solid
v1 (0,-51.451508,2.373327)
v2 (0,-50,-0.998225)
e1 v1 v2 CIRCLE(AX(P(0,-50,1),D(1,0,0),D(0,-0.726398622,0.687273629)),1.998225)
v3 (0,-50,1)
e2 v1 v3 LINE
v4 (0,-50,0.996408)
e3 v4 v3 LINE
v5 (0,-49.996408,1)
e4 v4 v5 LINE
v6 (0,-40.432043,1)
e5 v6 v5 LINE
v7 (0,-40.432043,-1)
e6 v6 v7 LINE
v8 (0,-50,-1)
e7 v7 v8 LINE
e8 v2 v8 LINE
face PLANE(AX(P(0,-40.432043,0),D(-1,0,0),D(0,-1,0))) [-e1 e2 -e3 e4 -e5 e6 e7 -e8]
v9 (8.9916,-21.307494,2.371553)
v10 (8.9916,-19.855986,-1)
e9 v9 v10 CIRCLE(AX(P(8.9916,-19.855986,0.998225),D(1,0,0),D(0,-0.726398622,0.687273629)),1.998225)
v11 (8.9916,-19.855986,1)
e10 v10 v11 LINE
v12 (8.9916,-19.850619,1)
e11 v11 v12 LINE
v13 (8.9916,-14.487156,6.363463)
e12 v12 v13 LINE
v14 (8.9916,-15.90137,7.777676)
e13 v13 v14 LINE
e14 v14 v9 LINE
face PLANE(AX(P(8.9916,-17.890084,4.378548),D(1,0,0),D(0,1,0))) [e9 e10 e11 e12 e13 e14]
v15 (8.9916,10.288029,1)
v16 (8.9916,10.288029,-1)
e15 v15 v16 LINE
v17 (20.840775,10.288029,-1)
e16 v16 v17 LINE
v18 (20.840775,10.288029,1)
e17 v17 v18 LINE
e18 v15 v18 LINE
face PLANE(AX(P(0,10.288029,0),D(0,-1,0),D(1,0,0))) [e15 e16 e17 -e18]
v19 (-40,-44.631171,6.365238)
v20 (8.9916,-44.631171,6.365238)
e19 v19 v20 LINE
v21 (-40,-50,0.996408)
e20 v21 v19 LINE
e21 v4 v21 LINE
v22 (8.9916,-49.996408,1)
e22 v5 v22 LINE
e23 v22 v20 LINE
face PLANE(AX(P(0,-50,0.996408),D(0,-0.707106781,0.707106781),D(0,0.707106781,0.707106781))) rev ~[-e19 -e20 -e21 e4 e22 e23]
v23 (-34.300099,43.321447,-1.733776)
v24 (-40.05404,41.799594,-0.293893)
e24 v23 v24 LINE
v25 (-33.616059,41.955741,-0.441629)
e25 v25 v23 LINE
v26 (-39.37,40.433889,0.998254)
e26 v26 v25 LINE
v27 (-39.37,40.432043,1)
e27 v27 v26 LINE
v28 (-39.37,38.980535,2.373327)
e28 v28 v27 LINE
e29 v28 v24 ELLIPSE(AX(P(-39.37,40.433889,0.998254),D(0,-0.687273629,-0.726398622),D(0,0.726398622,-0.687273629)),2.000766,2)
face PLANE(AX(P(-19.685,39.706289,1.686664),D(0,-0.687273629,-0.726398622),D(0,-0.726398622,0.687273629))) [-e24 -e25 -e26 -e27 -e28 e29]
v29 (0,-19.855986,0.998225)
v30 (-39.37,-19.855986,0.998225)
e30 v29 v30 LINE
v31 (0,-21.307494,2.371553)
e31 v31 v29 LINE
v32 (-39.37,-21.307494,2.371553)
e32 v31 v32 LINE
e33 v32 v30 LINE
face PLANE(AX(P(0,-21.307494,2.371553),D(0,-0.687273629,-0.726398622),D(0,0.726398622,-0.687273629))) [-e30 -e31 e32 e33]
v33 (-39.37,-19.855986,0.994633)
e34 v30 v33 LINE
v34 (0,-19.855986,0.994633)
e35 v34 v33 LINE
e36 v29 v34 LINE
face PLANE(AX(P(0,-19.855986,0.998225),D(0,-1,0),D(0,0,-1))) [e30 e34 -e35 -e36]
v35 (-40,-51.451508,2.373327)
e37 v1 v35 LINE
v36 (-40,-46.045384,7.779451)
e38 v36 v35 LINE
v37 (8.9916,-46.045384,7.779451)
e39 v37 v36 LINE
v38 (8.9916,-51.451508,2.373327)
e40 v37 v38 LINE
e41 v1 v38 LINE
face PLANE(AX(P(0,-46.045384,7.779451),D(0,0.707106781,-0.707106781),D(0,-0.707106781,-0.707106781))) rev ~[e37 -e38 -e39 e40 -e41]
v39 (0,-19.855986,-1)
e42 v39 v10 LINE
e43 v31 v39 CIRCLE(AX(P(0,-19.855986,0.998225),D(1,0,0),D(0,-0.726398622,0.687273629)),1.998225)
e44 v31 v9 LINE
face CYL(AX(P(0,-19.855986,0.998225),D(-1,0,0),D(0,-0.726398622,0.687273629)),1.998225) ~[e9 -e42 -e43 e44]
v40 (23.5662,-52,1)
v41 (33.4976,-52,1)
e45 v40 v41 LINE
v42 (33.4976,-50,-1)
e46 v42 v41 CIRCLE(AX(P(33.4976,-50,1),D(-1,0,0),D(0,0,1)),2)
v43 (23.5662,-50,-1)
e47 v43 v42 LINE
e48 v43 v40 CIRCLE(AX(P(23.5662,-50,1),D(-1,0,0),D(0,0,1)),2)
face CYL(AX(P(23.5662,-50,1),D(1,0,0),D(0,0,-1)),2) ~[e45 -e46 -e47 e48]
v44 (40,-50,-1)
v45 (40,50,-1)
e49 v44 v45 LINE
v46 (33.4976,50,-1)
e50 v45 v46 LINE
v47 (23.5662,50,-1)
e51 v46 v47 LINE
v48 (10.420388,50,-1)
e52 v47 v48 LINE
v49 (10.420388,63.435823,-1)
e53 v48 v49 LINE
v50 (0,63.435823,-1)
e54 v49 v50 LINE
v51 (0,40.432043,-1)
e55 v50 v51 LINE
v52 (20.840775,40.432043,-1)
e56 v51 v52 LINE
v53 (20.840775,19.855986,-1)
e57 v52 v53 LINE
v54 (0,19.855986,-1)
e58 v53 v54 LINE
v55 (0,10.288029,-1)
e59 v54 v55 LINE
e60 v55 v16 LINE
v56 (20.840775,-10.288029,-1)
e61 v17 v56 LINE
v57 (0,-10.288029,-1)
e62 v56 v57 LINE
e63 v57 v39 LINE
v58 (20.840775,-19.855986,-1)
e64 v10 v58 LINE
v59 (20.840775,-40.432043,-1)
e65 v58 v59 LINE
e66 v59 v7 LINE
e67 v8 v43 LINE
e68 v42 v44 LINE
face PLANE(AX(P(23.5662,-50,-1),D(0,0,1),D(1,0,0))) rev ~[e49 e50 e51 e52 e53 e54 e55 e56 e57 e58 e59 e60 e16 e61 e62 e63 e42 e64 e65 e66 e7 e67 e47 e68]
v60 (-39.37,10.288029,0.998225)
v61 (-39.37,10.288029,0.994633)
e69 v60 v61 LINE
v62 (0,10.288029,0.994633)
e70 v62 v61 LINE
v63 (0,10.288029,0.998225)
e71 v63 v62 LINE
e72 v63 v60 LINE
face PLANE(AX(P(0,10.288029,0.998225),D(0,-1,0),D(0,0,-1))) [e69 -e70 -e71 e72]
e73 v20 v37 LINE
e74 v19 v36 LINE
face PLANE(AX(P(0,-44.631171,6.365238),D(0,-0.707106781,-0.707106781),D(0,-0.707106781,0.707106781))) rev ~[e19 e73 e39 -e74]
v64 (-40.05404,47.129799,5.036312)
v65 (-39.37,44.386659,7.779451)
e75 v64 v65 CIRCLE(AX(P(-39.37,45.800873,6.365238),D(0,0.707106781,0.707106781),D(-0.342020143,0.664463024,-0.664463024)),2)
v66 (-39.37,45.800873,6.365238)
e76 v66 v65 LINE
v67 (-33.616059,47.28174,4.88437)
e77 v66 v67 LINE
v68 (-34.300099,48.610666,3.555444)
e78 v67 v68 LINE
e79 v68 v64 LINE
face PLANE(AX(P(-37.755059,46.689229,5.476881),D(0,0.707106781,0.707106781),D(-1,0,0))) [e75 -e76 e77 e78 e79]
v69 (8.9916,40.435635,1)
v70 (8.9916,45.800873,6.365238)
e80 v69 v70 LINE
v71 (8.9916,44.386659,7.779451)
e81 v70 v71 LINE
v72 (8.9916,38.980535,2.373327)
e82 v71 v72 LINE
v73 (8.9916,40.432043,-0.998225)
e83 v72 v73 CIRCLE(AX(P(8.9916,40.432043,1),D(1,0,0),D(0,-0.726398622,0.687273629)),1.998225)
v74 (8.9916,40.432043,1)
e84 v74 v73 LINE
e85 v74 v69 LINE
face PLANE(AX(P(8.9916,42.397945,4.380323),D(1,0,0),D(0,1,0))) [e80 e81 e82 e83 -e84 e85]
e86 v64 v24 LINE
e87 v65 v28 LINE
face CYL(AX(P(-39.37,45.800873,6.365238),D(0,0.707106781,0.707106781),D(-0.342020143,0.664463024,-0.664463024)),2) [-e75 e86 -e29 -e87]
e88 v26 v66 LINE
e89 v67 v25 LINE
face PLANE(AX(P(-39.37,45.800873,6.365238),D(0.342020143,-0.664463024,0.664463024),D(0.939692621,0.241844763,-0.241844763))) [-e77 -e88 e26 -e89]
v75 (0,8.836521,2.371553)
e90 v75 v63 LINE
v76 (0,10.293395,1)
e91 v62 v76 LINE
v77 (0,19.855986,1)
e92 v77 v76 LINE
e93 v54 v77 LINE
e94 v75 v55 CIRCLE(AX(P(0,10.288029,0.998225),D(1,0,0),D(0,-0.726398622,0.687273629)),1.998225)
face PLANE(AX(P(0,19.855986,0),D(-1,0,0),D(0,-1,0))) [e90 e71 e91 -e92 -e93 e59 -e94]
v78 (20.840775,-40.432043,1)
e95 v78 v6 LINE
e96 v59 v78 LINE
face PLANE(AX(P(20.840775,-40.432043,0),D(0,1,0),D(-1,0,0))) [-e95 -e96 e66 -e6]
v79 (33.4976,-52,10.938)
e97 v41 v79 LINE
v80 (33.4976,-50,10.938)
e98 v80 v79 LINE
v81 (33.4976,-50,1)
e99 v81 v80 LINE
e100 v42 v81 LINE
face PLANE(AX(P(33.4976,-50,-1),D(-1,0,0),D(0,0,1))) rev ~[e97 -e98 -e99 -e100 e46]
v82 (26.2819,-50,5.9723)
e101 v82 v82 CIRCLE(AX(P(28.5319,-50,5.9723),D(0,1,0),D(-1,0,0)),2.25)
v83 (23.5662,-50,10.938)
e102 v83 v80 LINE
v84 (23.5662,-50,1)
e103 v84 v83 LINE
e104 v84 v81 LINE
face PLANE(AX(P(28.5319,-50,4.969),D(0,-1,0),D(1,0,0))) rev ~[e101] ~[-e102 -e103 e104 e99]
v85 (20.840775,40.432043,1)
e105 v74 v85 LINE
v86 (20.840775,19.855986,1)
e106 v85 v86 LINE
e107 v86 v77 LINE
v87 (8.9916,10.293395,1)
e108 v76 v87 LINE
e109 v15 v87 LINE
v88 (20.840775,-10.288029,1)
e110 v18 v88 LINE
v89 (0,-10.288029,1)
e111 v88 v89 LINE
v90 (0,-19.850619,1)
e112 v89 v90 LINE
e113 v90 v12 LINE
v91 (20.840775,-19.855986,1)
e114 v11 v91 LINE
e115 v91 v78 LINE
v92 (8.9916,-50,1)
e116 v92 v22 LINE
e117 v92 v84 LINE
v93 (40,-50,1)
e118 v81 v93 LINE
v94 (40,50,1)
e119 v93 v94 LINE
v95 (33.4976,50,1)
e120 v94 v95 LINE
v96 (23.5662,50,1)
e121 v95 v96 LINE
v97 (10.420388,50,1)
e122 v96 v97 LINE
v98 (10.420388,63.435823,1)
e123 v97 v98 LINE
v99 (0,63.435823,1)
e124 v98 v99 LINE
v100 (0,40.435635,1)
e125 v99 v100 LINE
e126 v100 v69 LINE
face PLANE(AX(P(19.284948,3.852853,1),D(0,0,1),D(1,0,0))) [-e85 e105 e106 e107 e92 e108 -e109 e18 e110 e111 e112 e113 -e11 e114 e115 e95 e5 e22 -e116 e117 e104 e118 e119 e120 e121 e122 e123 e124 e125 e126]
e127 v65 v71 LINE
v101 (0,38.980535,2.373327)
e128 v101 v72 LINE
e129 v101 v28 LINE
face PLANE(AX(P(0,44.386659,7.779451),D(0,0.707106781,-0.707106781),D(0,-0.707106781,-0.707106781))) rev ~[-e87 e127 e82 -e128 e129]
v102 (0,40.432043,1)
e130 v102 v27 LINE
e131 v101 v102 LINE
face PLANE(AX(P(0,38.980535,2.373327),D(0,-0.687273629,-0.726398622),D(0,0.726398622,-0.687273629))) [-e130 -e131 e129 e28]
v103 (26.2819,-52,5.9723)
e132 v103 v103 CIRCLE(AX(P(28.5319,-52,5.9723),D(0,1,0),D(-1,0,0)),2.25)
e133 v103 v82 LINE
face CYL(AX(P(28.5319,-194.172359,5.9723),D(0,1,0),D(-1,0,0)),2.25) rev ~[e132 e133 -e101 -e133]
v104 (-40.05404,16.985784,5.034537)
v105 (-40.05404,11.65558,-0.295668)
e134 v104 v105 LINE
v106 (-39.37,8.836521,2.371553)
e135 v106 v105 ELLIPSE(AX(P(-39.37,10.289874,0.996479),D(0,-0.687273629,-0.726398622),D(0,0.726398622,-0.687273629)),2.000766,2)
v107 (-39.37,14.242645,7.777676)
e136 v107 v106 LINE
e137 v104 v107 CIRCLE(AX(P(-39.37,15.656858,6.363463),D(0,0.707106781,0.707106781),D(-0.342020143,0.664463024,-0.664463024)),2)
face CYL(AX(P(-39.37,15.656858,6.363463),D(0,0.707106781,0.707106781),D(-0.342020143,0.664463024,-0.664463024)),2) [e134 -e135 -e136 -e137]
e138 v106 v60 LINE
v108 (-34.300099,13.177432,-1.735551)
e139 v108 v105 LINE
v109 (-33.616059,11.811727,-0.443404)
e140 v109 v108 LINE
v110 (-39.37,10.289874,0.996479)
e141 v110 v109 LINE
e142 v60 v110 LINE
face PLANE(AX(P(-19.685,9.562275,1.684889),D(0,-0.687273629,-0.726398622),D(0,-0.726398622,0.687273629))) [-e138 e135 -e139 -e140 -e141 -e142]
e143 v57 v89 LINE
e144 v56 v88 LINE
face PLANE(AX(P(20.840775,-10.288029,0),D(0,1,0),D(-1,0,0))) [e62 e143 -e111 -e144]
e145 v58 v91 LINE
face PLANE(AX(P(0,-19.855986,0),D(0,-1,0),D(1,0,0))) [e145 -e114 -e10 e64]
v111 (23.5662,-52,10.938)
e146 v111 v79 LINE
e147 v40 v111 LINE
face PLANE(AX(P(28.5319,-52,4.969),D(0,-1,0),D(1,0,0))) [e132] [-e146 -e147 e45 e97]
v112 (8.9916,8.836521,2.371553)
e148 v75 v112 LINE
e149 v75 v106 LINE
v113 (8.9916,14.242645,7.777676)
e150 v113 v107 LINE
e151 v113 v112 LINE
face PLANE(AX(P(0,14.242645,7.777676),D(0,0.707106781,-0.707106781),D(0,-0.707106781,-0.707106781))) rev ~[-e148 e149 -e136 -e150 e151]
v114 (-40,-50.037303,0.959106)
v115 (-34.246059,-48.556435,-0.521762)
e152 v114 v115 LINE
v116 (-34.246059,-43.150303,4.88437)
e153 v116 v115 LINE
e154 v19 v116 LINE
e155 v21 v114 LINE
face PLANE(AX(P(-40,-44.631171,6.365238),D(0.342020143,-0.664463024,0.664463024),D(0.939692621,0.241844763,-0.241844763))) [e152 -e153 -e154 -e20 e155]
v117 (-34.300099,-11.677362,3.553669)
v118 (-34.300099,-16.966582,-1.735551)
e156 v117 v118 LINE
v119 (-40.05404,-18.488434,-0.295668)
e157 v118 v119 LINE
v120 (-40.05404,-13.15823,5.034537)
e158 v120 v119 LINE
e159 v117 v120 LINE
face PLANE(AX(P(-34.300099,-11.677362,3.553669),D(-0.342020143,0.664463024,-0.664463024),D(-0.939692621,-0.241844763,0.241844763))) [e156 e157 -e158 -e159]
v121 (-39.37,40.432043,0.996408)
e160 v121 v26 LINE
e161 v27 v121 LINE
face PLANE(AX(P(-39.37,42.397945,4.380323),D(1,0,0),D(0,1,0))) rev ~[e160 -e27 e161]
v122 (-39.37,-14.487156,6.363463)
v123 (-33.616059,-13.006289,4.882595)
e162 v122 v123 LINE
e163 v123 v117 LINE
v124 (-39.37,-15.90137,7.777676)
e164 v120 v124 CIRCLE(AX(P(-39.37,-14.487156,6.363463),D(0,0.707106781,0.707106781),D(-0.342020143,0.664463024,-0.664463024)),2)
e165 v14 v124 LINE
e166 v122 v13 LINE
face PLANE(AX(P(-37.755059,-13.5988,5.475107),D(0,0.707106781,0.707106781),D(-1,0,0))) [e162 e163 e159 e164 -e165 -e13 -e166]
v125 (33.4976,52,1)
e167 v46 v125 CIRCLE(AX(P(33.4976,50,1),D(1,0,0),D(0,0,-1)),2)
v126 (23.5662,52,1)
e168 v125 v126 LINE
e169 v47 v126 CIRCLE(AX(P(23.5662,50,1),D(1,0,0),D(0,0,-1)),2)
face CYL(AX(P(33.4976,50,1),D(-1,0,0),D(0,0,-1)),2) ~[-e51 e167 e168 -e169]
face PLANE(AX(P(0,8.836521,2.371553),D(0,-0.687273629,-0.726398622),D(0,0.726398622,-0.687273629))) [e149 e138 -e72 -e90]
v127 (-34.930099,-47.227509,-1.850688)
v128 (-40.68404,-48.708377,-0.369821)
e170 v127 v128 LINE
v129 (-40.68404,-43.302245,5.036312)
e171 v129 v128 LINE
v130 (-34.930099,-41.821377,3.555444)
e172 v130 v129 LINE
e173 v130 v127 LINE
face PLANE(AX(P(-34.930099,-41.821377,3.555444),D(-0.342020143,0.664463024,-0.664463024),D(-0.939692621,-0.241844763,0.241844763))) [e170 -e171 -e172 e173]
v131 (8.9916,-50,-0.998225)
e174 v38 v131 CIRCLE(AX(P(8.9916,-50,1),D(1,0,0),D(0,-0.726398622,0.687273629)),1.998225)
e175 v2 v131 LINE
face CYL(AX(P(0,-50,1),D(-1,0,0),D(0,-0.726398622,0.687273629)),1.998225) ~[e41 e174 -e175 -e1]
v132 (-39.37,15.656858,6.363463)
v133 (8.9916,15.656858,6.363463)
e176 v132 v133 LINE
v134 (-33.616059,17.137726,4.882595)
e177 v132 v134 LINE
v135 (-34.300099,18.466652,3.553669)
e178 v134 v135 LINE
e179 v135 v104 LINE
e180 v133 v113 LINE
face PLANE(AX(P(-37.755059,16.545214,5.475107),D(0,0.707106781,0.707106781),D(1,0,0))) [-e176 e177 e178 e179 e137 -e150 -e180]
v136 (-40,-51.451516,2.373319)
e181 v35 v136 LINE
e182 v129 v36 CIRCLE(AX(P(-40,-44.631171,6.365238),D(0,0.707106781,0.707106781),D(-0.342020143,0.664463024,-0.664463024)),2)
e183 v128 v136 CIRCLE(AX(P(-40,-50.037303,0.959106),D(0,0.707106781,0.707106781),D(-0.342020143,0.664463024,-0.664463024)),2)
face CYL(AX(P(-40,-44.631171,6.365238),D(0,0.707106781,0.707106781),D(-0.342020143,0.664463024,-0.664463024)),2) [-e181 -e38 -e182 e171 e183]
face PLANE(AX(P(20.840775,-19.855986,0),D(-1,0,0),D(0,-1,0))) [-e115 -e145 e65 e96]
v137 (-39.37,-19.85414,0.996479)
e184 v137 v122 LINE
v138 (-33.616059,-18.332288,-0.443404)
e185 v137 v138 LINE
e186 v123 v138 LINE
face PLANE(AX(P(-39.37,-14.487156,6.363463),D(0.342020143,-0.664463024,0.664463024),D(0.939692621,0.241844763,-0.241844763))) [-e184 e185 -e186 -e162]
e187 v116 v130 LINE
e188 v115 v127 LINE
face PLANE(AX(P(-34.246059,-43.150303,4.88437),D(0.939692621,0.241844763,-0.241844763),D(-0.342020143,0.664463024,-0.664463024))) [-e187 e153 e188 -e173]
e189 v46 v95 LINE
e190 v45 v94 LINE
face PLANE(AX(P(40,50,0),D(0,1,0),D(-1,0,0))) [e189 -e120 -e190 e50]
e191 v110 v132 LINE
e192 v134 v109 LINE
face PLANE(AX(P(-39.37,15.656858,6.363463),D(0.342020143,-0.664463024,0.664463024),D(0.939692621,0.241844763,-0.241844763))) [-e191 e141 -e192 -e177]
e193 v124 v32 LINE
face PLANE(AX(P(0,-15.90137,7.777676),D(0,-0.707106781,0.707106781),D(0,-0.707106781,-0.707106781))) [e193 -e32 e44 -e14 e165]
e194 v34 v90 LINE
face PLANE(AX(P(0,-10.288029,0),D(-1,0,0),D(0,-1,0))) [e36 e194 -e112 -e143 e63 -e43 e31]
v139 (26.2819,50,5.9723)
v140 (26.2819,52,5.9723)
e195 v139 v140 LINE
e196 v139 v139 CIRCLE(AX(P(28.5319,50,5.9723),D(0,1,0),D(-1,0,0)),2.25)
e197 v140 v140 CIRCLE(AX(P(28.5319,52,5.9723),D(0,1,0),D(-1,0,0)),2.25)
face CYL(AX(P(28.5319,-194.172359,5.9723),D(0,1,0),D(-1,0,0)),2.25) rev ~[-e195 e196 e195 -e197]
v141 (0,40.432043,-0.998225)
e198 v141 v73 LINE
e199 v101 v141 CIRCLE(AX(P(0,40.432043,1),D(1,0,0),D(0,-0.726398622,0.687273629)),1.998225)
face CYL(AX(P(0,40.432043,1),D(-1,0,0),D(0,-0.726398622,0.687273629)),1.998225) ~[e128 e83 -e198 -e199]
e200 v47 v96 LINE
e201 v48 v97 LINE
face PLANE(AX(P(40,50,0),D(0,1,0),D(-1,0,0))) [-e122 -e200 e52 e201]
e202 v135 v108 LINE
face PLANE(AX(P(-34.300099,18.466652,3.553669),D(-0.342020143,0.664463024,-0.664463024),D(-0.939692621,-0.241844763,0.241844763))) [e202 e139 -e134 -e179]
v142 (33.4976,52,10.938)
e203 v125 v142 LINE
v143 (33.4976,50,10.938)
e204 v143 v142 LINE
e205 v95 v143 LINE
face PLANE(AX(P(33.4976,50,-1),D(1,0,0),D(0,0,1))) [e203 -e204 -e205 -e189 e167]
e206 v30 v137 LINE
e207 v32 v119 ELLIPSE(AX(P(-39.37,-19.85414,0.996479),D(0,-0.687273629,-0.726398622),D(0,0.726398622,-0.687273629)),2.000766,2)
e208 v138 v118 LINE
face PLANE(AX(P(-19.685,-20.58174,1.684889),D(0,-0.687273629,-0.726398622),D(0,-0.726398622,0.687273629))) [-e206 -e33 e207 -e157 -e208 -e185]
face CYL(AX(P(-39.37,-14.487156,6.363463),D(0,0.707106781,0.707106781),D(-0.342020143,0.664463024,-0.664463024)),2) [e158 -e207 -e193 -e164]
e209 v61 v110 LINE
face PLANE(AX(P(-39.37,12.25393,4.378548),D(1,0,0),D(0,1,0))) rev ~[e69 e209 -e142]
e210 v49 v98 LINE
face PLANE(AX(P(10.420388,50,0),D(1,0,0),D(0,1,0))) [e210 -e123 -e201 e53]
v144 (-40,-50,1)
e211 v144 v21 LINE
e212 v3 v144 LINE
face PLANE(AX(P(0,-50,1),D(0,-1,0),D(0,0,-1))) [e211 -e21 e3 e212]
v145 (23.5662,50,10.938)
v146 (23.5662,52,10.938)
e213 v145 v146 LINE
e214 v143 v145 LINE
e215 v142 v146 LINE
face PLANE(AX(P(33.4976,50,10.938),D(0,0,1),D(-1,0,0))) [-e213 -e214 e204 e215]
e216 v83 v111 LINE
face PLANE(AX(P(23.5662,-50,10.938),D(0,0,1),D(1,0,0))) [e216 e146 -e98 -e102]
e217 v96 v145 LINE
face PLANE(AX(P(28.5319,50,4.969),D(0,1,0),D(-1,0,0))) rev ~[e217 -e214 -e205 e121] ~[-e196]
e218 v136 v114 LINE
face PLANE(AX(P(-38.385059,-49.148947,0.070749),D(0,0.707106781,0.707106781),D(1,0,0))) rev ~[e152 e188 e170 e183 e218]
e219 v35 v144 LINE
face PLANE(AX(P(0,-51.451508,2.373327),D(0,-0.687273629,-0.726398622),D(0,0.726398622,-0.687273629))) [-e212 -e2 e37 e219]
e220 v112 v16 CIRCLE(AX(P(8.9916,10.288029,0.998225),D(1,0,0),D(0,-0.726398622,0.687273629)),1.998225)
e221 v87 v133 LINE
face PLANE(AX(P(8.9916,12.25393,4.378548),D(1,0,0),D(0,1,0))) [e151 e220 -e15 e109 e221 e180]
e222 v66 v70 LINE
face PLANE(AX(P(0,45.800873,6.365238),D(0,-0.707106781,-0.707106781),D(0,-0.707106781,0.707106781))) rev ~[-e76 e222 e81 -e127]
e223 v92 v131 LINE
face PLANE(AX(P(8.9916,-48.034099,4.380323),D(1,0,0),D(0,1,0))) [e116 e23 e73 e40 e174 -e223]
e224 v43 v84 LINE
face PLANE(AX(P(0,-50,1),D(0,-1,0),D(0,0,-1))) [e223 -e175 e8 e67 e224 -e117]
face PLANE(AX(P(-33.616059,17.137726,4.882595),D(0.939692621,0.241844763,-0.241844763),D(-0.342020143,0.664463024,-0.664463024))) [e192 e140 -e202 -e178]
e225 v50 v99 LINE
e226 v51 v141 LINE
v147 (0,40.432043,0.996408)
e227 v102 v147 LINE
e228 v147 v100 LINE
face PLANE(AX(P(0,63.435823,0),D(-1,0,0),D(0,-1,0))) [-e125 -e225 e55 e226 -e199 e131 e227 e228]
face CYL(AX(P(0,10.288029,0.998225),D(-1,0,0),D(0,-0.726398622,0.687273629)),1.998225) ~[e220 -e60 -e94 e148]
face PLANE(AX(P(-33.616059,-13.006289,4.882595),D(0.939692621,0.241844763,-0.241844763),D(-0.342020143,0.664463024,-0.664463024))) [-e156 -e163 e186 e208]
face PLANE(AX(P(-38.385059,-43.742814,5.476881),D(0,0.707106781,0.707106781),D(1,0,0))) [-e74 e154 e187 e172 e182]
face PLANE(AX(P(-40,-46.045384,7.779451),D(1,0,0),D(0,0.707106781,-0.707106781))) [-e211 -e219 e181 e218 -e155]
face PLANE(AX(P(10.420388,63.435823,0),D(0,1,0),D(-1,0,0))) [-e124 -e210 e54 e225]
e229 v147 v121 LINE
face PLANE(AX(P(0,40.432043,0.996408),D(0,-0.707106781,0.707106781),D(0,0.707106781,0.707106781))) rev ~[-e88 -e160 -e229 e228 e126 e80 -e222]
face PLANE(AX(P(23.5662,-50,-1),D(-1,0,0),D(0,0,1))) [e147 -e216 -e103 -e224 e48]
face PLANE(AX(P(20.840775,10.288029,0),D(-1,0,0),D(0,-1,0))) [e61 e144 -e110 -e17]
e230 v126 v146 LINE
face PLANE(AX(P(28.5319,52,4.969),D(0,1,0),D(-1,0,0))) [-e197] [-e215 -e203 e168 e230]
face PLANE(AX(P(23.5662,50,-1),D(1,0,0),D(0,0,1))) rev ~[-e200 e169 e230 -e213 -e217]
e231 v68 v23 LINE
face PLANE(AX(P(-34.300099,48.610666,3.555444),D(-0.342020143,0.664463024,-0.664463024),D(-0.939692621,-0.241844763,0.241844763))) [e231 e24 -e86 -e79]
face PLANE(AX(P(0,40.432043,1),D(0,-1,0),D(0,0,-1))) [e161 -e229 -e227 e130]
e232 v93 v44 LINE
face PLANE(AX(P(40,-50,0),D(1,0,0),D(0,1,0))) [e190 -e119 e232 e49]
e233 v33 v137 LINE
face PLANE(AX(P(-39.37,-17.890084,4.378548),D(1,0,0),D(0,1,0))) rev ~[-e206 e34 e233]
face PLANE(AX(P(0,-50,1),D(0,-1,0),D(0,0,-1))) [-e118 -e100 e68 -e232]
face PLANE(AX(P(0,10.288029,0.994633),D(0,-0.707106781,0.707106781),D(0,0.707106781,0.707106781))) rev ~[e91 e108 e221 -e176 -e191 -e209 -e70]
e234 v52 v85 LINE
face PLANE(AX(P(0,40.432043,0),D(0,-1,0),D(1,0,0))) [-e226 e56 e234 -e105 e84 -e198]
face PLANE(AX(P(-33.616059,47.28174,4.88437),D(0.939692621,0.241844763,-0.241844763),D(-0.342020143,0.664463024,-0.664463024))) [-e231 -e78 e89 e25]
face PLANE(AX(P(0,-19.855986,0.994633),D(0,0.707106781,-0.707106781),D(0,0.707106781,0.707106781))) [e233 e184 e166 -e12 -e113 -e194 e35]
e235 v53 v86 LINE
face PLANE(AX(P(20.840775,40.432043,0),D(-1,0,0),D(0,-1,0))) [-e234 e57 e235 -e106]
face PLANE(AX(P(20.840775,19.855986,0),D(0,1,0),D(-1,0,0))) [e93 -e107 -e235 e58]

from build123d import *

# Parameters (mm, degrees)
F1_DEPTH  = 1
F3_DEPTH  = 40
F5_DEPTH  = 7.6454254
F8_DEPTH  = 8.9916
F9_DEPTH  = 39.37
F11_REACH = 42.1217729552
F13_REACH = 63.4368099505
F15_REACH = 84.7531019793
F16_W     = 9.9314
F16_H     = 11.938
F17_DEPTH = 2
F18_W     = 9.9314
F18_H     = 11.938
F19_DEPTH = 2
F20_R     = 2
F22_D     = 4.5


with BuildPart() as f1:
    # F0 (on Top) → F1 (new body, symmetric)
    with BuildSketch(Plane.XY):
        Polygon((40, -50), (40, 50), (10.4203875556, 50), (10.4203875556, 63.4358227253), (0, 63.4358227253), (0, 50), (0, 40.4320432043), (20.8407751113, 40.4320432043), (20.8407751113, 19.8559855986), (0, 19.8559855986), (0, 10.2880288029), (20.8407751113, 10.2880288029), (20.8407751113, -10.2880288029), (0, -10.2880288029), (0, -19.8559855986), (20.8407751113, -19.8559855986), (20.8407751113, -40.4320432043), (0, -40.4320432043), (0, -50), align=None)
    extrude(amount=F1_DEPTH, both=True)

    # F2 (on Right) → F3 (join)
    with BuildSketch(Plane.YZ):
        Polygon((-50, 1), (-50, 0.9964082731), (-44.6311706177, 6.3652376554), (-46.04538418, 7.7794512178), (-51.4515079706, 2.3733274272), align=None)
    extrude(amount=-F3_DEPTH)

    # F4 (on face) → F5 (join)
    with BuildSketch(Plane(origin=(0, -19.1329664811, -19.1329664811), x_dir=(1, 0, 0), z_dir=(0, 0.7071067812, 0.7071067812))):
        with BuildLine():
            Line((-34.9300994608, -32.0862576741), (-40.6840402867, -34.1805208645))
            ThreePointArc((-40.6840402867, -34.1805208645), (-41.969615506, -36.4072024614), (-40, -38.059906106))
            Line((-40, -38.059906106), (-40, -36.059906106))
            Line((-40, -36.059906106), (-34.2460591741, -33.9656429157))
            Line((-34.2460591741, -33.9656429157), (-34.9300994608, -32.0862576741))
        make_face()
    extrude(amount=-F5_DEPTH)

    # F6 (on Right) + F2 (on Right) + F7 (on Right) → F8 (join)
    with BuildSketch(Plane.YZ):
        Polygon((-19.8559855986, 0.9982251152), (-19.8559855986, 0.9946333883), (-14.4871562162, 6.3634627706), (-15.9013697786, 7.777676333), (-21.3074935692, 2.3715525424), align=None)
        with BuildLine():
            Line((-19.8559855986, -1), (-19.8559855986, 0.9946333883))
            Line((-19.8559855986, 0.9946333883), (-19.8559855986, 0.9982251152))
            Line((-19.8559855986, 0.9982251152), (-21.3074935692, 2.3715525424))
            ThreePointArc((-21.3074935692, 2.3715525424), (-21.6913494545, 0.2080712521), (-19.8559855986, -1))
        make_face()
    with BuildSketch(Plane.YZ):
        Polygon((-50, 1), (-50, 0.9964082731), (-44.6311706177, 6.3652376554), (-46.04538418, 7.7794512178), (-51.4515079706, 2.3733274272), align=None)
        with BuildLine():
            Line((-50, -0.9982251152), (-50, 0.9964082731))
            Line((-50, 0.9964082731), (-50, 1))
            Line((-50, 1), (-51.4515079706, 2.3733274272))
            ThreePointArc((-51.4515079706, 2.3733274272), (-51.8353638559, 0.2098461369), (-50, -0.9982251152))
        make_face()
    with BuildSketch(Plane.YZ):
        Polygon((10.2880288029, 0.9982251152), (10.2880288029, 0.9946333883), (15.6568581852, 6.3634627706), (14.2426446228, 7.777676333), (8.8365208322, 2.3715525424), align=None)
        with BuildLine():
            Line((10.2880288029, -1), (10.2880288029, 0.9946333883))
            Line((10.2880288029, 0.9946333883), (10.2880288029, 0.9982251152))
            Line((10.2880288029, 0.9982251152), (8.8365208322, 2.3715525424))
            ThreePointArc((8.8365208322, 2.3715525424), (8.4526649469, 0.2080712521), (10.2880288029, -1))
        make_face()
        Polygon((40.4320432043, 1), (40.4320432043, 0.9964082731), (45.8008725867, 6.3652376554), (44.3866590243, 7.7794512177), (38.9805352337, 2.3733274272), align=None)
        with BuildLine():
            Line((40.4320432043, -0.9982251152), (40.4320432043, 0.9964082731))
            Line((40.4320432043, 0.9964082731), (40.4320432043, 1))
            Line((40.4320432043, 1), (38.9805352337, 2.3733274272))
            ThreePointArc((38.9805352337, 2.3733274272), (38.5966793484, 0.2098461369), (40.4320432043, -0.9982251152))
        make_face()
    extrude(amount=F8_DEPTH)

    # F6 (on Right) + F7 (on Right) → F9 (join)
    with BuildSketch(Plane.YZ):
        Polygon((-19.8559855986, 0.9982251152), (-19.8559855986, 0.9946333883), (-14.4871562162, 6.3634627706), (-15.9013697786, 7.777676333), (-21.3074935692, 2.3715525424), align=None)
    with BuildSketch(Plane.YZ):
        Polygon((10.2880288029, 0.9982251152), (10.2880288029, 0.9946333883), (15.6568581852, 6.3634627706), (14.2426446228, 7.777676333), (8.8365208322, 2.3715525424), align=None)
        Polygon((40.4320432043, 1), (40.4320432043, 0.9964082731), (45.8008725867, 6.3652376554), (44.3866590243, 7.7794512177), (38.9805352337, 2.3733274272), align=None)
    extrude(amount=-F9_DEPTH)

    f11_end = Plane(origin=(-19.685, -20.5817395839, 1.6848888288), x_dir=(0, -0.7263986223, 0.6872736293), z_dir=(0, -0.6872736293, -0.7263986223))
    # F10 (on face) → F11 (join, up to a plane its end follows)
    with BuildSketch(Plane(origin=(0, -4.0618467228, -4.0618467228), x_dir=(-1, 0, 0), z_dir=(0, 0.7071067812, 0.7071067812))):
        with BuildLine():
            Line((34.3000994608, 10.7699656456), (40.0540402867, 12.8642288359))
            ThreePointArc((40.0540402867, 12.8642288359), (41.339615506, 15.0909104328), (39.37, 16.7436140775))
            Line((39.37, 16.7436140775), (39.37, 14.7436140775))
            Line((39.37, 14.7436140775), (33.6160591741, 12.6493508872))
            Line((33.6160591741, 12.6493508872), (34.3000994608, 10.7699656456))
        make_face()
    f11_long = extrude(amount=-F11_REACH, mode=Mode.PRIVATE)
    add(split(f11_long, bisect_by=f11_end, keep=Keep.BOTTOM, mode=Mode.PRIVATE))

    f13_end = Plane(origin=(-19.685, 9.5622748176, 1.6848888288), x_dir=(0, -0.7263986223, 0.6872736293), z_dir=(0, -0.6872736293, -0.7263986223))
    # F12 (on face) → F13 (join, up to a plane its end follows)
    with BuildSketch(Plane(origin=(0, 11.0101604779, 11.0101604779), x_dir=(1, 0, 0), z_dir=(0, 0.7071067812, 0.7071067812))):
        with BuildLine():
            Line((-34.3000994608, 10.5450713499), (-40.0540402867, 8.4508081595))
            ThreePointArc((-40.0540402867, 8.4508081595), (-41.339615506, 6.2241265626), (-39.37, 4.5714229179))
            Line((-39.37, 4.5714229179), (-39.37, 6.5714229179))
            Line((-39.37, 6.5714229179), (-33.6160591741, 8.6656861083))
            Line((-33.6160591741, 8.6656861083), (-34.3000994608, 10.5450713499))
        make_face()
    f13_long = extrude(amount=-F13_REACH, mode=Mode.PRIVATE)
    add(split(f13_long, bisect_by=f13_end, keep=Keep.BOTTOM, mode=Mode.PRIVATE))

    f15_end = Plane(origin=(-19.685, 39.706289219, 1.6866637136), x_dir=(0, -0.7263986223, 0.6872736293), z_dir=(0, -0.6872736293, -0.7263986223))
    # F14 (on face) → F15 (join, up to a plane its end follows)
    with BuildSketch(Plane(origin=(0, 26.0830551211, 26.083055121), x_dir=(-1, 0, 0), z_dir=(0, 0.7071067812, 0.7071067812))):
        with BuildLine():
            Line((34.3000994608, -31.8588533121), (40.0540402867, -29.7645901218))
            ThreePointArc((40.0540402867, -29.7645901218), (41.339615506, -27.5379085249), (39.37, -25.8852048802))
            Line((39.37, -25.8852048802), (39.37, -27.8852048802))
            Line((39.37, -27.8852048802), (33.6160591741, -29.9794680706))
            Line((33.6160591741, -29.9794680706), (34.3000994608, -31.8588533121))
        make_face()
    f15_long = extrude(amount=-F15_REACH, mode=Mode.PRIVATE)
    add(split(f15_long, bisect_by=f15_end, keep=Keep.BOTTOM, mode=Mode.PRIVATE))

    # F16 (on face) → F17 (join)
    with BuildSketch(Plane(origin=(0, 50, 0), x_dir=(-1, 0, 0), z_dir=(0, 1, 0))):
        with Locations((-28.5319, 4.969)):
            Rectangle(F16_W, F16_H)
    extrude(amount=F17_DEPTH)

    # F18 (on face) → F19 (join)
    with BuildSketch(Plane.XZ.offset(50)):
        with Locations((28.5319, 4.969)):
            Rectangle(F18_W, F18_H)
    extrude(amount=F19_DEPTH)

    # F20
    f20_edges = [f1.edges().sort_by_distance(p)[0] for p in [
        (28.5319, -52, -1),
        (28.5319, 52, -1),
    ]]
    fillet(f20_edges, radius=F20_R)

    # F22 (through all)
    with Locations(Plane.XZ.offset(52)):
        with Locations((28.5319, 5.9723)):
            Hole(F22_D / 2)


solid = f1.part
